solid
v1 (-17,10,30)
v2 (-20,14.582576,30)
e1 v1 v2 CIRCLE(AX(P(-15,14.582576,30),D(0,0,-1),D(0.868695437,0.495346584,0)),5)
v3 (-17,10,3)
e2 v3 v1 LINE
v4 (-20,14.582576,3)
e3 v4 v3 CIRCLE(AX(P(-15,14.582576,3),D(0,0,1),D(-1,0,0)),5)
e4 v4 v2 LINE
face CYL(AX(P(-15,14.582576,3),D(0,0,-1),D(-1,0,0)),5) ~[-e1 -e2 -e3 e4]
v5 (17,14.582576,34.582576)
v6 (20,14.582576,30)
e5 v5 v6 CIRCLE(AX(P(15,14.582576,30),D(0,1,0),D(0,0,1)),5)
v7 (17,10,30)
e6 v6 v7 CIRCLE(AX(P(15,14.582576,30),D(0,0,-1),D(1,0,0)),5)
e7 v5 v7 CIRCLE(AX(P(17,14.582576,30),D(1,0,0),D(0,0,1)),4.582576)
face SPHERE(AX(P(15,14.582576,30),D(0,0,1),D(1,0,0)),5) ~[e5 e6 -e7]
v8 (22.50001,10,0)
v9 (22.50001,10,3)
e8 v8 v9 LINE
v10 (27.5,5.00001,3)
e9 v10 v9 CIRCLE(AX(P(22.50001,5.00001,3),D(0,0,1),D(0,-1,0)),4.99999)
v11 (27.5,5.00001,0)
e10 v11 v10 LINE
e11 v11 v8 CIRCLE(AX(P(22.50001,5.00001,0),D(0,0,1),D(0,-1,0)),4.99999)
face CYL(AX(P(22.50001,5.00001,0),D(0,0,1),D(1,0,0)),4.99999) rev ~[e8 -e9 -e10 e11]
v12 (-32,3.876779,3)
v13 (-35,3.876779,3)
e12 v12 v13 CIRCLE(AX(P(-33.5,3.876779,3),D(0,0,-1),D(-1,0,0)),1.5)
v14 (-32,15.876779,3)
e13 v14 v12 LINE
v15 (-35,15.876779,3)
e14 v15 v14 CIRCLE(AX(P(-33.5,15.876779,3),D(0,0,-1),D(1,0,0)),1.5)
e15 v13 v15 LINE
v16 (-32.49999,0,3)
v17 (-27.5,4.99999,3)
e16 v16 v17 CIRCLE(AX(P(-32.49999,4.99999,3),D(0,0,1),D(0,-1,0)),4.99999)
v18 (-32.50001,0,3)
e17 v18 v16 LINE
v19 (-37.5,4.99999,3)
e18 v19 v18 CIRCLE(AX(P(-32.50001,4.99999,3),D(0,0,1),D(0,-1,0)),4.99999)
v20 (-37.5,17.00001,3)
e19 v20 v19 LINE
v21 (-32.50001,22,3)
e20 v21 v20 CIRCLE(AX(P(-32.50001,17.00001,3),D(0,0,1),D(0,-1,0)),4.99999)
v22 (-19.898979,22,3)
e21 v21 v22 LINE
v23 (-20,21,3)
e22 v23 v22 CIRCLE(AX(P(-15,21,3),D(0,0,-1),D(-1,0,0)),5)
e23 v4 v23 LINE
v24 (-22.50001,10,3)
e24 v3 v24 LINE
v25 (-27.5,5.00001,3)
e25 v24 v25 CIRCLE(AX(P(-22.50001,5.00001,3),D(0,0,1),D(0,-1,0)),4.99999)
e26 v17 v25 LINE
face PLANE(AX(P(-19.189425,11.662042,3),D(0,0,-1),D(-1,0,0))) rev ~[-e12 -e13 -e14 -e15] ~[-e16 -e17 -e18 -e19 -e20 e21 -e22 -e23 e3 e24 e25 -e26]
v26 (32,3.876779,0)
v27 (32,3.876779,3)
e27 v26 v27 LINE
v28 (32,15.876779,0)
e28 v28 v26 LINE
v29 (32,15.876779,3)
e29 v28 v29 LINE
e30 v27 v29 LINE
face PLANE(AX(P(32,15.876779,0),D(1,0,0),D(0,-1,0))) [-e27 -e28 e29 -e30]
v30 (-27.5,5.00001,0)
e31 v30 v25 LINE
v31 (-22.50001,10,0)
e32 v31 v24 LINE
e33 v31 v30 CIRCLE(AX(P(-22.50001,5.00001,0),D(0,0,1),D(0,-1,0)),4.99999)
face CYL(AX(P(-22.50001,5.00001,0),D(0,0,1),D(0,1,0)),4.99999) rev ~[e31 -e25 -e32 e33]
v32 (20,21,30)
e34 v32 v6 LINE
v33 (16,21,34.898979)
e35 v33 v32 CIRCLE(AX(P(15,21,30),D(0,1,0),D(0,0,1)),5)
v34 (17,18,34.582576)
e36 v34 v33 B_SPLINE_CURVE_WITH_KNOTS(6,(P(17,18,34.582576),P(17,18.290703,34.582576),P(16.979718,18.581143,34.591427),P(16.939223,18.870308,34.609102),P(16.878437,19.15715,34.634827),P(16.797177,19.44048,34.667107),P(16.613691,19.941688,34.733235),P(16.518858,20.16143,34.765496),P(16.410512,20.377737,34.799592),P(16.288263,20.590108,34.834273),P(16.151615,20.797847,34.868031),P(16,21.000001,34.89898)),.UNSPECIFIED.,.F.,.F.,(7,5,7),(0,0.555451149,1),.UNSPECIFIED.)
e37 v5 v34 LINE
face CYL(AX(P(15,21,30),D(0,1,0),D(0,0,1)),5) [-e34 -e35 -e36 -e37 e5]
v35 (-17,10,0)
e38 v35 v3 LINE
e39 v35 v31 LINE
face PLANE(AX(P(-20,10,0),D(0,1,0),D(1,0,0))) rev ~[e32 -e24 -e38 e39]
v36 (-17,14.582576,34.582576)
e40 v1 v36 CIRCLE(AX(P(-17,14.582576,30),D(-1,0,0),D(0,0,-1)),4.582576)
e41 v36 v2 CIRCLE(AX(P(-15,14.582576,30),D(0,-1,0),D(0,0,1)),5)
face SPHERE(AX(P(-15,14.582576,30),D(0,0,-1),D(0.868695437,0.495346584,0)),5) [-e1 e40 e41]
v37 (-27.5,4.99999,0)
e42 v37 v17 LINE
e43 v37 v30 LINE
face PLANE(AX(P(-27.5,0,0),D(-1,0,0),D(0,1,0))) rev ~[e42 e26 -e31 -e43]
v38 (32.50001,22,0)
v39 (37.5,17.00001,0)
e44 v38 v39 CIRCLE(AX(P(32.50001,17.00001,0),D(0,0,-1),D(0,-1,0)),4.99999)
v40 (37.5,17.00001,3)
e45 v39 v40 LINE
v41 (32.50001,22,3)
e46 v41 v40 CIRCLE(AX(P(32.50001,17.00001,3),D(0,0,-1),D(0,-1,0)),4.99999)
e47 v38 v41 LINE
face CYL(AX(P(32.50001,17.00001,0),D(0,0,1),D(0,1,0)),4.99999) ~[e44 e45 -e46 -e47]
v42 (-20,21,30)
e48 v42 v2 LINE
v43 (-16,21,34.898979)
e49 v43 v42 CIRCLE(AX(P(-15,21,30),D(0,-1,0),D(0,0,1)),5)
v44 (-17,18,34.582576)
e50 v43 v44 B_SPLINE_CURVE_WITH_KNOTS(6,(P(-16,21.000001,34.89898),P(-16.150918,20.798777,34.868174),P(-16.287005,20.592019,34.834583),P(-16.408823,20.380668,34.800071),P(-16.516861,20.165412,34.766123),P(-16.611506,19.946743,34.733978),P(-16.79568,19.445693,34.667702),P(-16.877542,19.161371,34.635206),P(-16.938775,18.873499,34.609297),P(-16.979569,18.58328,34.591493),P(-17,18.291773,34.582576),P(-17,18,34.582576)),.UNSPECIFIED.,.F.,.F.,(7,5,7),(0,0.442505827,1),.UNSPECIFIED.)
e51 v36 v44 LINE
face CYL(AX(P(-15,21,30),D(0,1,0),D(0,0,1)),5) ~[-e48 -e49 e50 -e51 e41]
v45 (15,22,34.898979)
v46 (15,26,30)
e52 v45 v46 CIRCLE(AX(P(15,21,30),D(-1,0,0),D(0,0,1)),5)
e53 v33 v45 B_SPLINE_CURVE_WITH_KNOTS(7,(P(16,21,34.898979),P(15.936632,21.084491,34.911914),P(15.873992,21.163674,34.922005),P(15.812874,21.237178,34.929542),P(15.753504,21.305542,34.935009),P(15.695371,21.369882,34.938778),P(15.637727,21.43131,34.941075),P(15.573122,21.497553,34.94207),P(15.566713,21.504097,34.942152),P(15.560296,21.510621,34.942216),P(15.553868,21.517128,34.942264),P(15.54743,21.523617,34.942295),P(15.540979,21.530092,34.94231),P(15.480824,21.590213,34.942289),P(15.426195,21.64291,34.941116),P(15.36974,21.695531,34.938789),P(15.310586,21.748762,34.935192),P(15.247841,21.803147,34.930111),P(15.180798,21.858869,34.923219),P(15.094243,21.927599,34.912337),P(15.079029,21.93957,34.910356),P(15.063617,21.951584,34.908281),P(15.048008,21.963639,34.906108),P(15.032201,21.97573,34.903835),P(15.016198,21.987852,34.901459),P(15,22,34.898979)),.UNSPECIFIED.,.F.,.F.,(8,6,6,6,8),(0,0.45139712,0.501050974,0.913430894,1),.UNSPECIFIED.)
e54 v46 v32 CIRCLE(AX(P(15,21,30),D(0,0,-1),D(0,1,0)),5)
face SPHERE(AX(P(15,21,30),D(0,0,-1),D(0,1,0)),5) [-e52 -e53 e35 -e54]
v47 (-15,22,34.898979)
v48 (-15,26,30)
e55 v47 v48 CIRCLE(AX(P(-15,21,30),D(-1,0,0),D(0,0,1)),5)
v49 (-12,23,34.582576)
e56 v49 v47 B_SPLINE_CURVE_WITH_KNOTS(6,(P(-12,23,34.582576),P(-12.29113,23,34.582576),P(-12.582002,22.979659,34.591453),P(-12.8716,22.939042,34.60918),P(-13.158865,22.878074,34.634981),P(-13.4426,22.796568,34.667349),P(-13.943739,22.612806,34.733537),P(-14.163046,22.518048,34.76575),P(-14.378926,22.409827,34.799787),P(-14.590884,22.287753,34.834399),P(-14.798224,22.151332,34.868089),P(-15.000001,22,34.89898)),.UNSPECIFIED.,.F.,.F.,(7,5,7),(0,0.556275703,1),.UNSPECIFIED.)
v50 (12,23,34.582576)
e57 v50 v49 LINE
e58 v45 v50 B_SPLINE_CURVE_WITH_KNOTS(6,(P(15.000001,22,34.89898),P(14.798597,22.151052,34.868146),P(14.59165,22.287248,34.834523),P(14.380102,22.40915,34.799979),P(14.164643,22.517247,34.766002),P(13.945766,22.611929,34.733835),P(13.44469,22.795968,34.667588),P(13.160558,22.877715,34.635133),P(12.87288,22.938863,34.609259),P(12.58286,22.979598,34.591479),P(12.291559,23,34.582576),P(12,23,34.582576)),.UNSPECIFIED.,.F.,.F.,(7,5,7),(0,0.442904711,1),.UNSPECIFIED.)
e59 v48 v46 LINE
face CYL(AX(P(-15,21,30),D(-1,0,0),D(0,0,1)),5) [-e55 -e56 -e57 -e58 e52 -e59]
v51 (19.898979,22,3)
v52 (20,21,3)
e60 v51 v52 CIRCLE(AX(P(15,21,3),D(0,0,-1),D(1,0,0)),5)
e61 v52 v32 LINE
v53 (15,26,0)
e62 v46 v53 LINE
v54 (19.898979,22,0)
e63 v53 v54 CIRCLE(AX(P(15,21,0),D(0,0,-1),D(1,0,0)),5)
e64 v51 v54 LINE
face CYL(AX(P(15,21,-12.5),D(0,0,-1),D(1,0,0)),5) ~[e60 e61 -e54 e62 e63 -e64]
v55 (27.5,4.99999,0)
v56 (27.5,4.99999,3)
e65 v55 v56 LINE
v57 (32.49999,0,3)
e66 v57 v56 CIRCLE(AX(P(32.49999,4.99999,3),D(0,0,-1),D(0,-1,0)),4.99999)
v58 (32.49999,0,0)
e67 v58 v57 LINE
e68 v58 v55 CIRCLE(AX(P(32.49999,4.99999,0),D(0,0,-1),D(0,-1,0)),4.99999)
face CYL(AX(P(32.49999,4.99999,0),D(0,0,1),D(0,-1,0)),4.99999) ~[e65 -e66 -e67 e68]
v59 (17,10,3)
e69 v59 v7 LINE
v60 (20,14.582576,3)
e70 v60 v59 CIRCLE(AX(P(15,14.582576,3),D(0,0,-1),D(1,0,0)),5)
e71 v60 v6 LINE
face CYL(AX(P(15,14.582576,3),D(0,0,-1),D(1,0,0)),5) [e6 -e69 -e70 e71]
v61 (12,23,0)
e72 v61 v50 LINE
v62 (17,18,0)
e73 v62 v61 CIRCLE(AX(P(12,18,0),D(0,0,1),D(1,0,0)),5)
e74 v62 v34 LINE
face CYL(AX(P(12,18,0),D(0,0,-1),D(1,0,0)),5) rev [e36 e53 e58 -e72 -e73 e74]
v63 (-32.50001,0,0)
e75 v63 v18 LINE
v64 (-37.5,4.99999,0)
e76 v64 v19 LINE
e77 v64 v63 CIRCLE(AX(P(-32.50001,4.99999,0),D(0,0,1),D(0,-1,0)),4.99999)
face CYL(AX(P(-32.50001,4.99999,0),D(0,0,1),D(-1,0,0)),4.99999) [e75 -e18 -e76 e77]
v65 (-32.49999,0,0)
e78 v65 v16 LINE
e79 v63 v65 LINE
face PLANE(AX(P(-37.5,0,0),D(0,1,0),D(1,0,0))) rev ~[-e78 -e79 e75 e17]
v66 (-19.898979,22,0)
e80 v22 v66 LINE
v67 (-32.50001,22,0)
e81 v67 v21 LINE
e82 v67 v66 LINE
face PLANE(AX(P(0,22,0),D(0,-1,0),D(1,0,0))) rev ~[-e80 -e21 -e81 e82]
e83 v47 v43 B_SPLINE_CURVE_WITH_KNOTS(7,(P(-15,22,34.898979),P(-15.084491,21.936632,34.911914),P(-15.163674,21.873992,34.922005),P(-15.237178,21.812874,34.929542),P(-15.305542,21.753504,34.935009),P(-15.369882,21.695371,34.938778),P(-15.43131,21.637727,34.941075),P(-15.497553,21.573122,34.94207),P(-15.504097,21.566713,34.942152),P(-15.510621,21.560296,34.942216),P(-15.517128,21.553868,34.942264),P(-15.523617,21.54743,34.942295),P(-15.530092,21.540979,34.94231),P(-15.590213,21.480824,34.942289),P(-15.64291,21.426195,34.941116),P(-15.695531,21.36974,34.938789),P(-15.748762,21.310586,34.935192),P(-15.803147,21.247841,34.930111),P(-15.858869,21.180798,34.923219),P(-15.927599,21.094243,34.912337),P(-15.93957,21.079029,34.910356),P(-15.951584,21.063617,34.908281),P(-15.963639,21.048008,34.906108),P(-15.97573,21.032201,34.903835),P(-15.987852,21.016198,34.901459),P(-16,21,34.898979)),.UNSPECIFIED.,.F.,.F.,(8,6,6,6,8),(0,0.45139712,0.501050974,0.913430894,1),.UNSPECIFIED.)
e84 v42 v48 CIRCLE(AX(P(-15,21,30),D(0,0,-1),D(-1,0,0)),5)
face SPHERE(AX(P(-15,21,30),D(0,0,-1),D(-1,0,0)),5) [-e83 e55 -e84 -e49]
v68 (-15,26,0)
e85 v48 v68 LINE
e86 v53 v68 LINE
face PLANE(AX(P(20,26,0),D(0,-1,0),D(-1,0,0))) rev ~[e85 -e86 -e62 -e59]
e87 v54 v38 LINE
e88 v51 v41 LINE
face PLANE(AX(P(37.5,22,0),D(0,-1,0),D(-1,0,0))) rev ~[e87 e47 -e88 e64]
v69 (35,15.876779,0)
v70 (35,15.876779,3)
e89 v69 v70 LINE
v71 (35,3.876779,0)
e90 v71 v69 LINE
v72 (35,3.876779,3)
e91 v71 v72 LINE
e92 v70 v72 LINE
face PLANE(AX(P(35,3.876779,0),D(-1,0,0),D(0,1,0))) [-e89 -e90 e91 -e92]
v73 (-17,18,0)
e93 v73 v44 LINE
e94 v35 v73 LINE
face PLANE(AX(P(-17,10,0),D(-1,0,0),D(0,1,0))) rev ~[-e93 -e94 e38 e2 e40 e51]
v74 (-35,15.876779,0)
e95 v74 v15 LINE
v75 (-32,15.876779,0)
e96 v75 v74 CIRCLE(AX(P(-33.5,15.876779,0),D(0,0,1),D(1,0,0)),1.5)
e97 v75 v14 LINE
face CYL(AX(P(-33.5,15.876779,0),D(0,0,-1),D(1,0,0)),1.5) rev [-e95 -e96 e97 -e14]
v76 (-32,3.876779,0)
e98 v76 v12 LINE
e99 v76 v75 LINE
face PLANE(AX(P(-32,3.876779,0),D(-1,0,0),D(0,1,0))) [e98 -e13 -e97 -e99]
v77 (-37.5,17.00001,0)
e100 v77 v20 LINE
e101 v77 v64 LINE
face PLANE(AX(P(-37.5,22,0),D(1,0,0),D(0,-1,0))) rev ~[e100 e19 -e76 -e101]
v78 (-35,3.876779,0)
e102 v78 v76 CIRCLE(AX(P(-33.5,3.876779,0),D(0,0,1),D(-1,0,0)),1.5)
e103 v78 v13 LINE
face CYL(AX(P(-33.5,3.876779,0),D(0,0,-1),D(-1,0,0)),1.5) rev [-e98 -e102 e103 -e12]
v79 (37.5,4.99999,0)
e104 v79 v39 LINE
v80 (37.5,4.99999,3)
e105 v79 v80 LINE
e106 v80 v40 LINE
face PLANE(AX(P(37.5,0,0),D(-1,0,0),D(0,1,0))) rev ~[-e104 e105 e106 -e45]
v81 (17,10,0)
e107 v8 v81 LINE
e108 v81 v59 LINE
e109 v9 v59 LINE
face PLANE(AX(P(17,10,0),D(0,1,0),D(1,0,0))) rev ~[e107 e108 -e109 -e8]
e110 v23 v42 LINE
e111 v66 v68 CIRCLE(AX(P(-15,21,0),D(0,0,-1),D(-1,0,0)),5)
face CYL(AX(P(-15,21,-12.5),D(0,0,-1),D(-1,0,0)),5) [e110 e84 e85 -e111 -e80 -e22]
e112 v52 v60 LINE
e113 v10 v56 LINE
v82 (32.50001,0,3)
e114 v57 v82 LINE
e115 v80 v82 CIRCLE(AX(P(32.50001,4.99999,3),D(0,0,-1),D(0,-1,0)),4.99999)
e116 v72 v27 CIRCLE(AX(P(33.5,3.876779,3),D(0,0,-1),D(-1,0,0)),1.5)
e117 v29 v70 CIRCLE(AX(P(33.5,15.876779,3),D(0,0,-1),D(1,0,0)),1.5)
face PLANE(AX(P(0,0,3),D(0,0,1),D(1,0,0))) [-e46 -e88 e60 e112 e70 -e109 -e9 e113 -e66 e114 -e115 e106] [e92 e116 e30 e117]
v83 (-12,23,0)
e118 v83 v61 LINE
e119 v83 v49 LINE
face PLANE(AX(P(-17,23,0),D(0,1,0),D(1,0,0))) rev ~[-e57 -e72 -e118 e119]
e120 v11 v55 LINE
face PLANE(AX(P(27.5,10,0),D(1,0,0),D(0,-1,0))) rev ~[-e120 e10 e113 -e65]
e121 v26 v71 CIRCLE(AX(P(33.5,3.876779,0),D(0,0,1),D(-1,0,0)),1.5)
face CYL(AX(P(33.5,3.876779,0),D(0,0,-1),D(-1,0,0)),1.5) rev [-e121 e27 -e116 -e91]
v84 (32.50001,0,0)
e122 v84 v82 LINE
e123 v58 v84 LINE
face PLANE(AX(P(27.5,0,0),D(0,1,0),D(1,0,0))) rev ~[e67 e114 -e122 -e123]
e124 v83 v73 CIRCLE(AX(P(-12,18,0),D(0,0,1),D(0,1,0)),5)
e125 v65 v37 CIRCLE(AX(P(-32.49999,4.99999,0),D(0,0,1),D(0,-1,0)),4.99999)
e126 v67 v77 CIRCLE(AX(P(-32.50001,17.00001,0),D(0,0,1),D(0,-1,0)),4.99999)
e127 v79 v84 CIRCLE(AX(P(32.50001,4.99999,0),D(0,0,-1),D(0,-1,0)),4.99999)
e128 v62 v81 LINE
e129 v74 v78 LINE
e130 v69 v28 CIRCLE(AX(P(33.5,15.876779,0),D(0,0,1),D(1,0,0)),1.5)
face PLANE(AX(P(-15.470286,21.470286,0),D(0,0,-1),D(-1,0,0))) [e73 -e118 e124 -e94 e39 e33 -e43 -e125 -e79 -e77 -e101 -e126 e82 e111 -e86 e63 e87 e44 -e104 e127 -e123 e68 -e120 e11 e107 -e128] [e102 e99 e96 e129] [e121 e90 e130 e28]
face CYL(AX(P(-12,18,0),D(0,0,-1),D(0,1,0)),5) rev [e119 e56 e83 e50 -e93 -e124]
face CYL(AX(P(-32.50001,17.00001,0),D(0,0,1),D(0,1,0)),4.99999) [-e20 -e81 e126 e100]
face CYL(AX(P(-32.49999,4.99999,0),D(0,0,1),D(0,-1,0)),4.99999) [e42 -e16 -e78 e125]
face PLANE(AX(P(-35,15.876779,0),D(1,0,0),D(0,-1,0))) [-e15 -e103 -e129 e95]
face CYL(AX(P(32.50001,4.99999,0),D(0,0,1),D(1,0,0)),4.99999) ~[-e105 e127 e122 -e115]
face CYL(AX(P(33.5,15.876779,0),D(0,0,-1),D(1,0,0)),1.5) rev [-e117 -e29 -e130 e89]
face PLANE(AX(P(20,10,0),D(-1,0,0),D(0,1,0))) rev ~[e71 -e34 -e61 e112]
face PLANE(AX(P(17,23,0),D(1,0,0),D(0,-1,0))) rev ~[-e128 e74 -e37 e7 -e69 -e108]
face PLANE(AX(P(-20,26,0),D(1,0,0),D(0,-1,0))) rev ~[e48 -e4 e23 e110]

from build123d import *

# Parameters (mm, degrees)
F2_DEPTH     = 35
F3_DEPTH     = 3
F4_DEPTH     = 25
F5_R         = 4.99999
F6_T1_DEPTH  = 35
F6_T3_DEPTH  = 35
F6_T8_DEPTH  = 60
F6_T13_DEPTH = 60
F6_T15_DEPTH = 43.4564392374
F6_T20_DEPTH = 60
F6_T25_DEPTH = 60
F6_T27_DEPTH = 43.4564392374
F7_T1_DEPTH  = 6.417424305
F7_T3_DEPTH  = 30
F7_T6_ANGLE  = 89.9999999974
F7_T8_ANGLE  = 89.9999999974
F7_T10_ANGLE = 209.6926070845
F7_T12_ANGLE = 209.6926070845


# Not quite as in the source:
# - a fillet or chamfer that OpenCascade refuses, or shapes differently, is made with other operations: its cross-section is extruded or revolved along the edge and cut away or added
# - a fillet or chamfer is up to 0.001 mm smaller than in the source, because OpenCascade refuses the exact size


with BuildPart() as f2:
    # F0 (on Top) → F2 (new body)
    with BuildSketch(Plane.XY):
        Polygon((20, 26), (0, 26), (-20, 26), (-20, 22), (-20, 10), (-17, 10), (-17, 23), (0, 23), (17, 23), (17, 10), (20, 10), (20, 22), align=None)
    extrude(amount=F2_DEPTH)

    # F0 (on Top) → F3 (join)
    with BuildSketch(Plane.XY):
        Polygon((-20, 10), (-20, 22), (-37.5, 22), (-37.5, 0), (-27.5, 0), (-27.5, 10), align=None)
        Polygon((37.5, 22), (20, 22), (20, 10), (27.5, 10), (27.5, 0), (37.5, 0), align=None)
    extrude(amount=F3_DEPTH)

    # F1 (on Top) → F4 (cut)
    with BuildSketch(Plane.XY):
        with BuildLine():
            Line((35, 3.8767794613), (35, 15.8767794613))
            ThreePointArc((35, 15.8767794613), (33.5, 17.3767794613), (32, 15.8767794613))
            Line((32, 15.8767794613), (32, 3.8767794613))
            ThreePointArc((32, 3.8767794613), (33.5, 2.3767794613), (35, 3.8767794613))
        make_face()
        with BuildLine():
            ThreePointArc((-32, 15.8767794613), (-33.5, 17.3767794613), (-35, 15.8767794613))
            Line((-35, 15.8767794613), (-35, 3.8767794613))
            ThreePointArc((-35, 3.8767794613), (-33.5, 2.3767794613), (-32, 3.8767794613))
            Line((-32, 3.8767794613), (-32, 15.8767794613))
        make_face()
    extrude(amount=F4_DEPTH, mode=Mode.SUBTRACT)

    # F5 (radius 5 in the source; OpenCascade refuses exactly that, so slightly less here)
    f5_edges = [f2.edges().sort_by_distance(p)[0] for p in [
        (-37.5, 0, 1.5),
        (-27.5, 0, 1.5),
        (-37.5, 22, 1.5),
        (37.5, 22, 1.5),
        (37.5, 0, 1.5),
        (27.5, 0, 1.5),
        (27.5, 10, 1.5),
        (-27.5, 10, 1.5),
    ]]
    fillet(f5_edges, radius=F5_R)

    # F6: fillet of radius 5 on 6 edges, made by hand

    # F6_s2 → F6_t1 (join)
    with BuildSketch(Plane.XY):
        with BuildLine():
            ThreePointArc((17, 18), (15.5355339059, 21.5355339059), (12, 23))
            Line((12, 23), (17, 23))
            Line((17, 23), (17, 18))
        make_face()
    extrude(amount=F6_T1_DEPTH)

    # F6_s4 → F6_t3 (join)
    with BuildSketch(Plane.XY):
        with BuildLine():
            ThreePointArc((-12, 23), (-15.5355339059, 21.5355339059), (-17, 18))
            Line((-17, 18), (-17, 23))
            Line((-17, 23), (-12, 23))
        make_face()
    extrude(amount=F6_T3_DEPTH)


with BuildPart() as f6_tool6:
    # F6_s7 → F6_t8 (new body)
    with BuildSketch(Plane.XY.offset(-12.5)):
        with BuildLine():
            ThreePointArc((20, 21), (18.5355339059, 24.5355339059), (15, 26))
            Line((15, 26), (20, 26))
            Line((20, 26), (20, 21))
        make_face()
    extrude(amount=F6_T8_DEPTH)

    split(bisect_by=Plane.XZ.offset(-22), keep=Keep.BOTTOM)


with BuildPart() as f2_1:
    add(f2.part)

    # F6_t5: cut F6_tool6
    add(f6_tool6.part, mode=Mode.SUBTRACT)


with BuildPart() as f6_tool11:
    # F6_s12 → F6_t13 (new body)
    with BuildSketch(Plane.XY.offset(-12.5)):
        with BuildLine():
            ThreePointArc((20, 21), (18.5355339059, 24.5355339059), (15, 26))
            Line((15, 26), (20, 26))
            Line((20, 26), (20, 21))
        make_face()
    extrude(amount=F6_T13_DEPTH)

    split(bisect_by=Plane.XY.offset(3), keep=Keep.TOP)


with BuildPart() as f2_2:
    add(f2_1.part)

    # F6_t10: cut F6_tool11
    add(f6_tool11.part, mode=Mode.SUBTRACT)

    # F6_s16 → F6_t15 (cut)
    with BuildSketch(Plane.XY.offset(3)):
        with BuildLine():
            ThreePointArc((20, 14.582575695), (19.1833001327, 11.8439629074), (17, 10))
            Line((17, 10), (20, 10))
            Line((20, 10), (20, 14.582575695))
        make_face()
    extrude(amount=F6_T15_DEPTH, mode=Mode.SUBTRACT)


with BuildPart() as f6_tool18:
    # F6_s19 → F6_t20 (new body)
    with BuildSketch(Plane.XY.offset(-12.5)):
        with BuildLine():
            ThreePointArc((-20, 21), (-18.5355339059, 24.5355339059), (-15, 26))
            Line((-15, 26), (-20, 26))
            Line((-20, 26), (-20, 21))
        make_face()
    extrude(amount=F6_T20_DEPTH)

    split(bisect_by=Plane.XZ.offset(-22), keep=Keep.BOTTOM)


with BuildPart() as f2_3:
    add(f2_2.part)

    # F6_t17: cut F6_tool18
    add(f6_tool18.part, mode=Mode.SUBTRACT)


with BuildPart() as f6_tool23:
    # F6_s24 → F6_t25 (new body)
    with BuildSketch(Plane.XY.offset(-12.5)):
        with BuildLine():
            ThreePointArc((-20, 21), (-18.5355339059, 24.5355339059), (-15, 26))
            Line((-15, 26), (-20, 26))
            Line((-20, 26), (-20, 21))
        make_face()
    extrude(amount=F6_T25_DEPTH)

    split(bisect_by=Plane.XY.offset(3), keep=Keep.TOP)


with BuildPart() as f2_4:
    add(f2_3.part)

    # F6_t22: cut F6_tool23
    add(f6_tool23.part, mode=Mode.SUBTRACT)

    # F6_s28 → F6_t27 (cut)
    with BuildSketch(Plane.XY.offset(3)):
        with BuildLine():
            ThreePointArc((-20, 14.582575695), (-19.1833001327, 11.8439629074), (-17, 10))
            Line((-17, 10), (-20, 10))
            Line((-20, 10), (-20, 14.582575695))
        make_face()
    extrude(amount=F6_T27_DEPTH, mode=Mode.SUBTRACT)

    # F7: fillet of radius 5 on 3 edges, made by hand

    # F7_s2 → F7_t1 (cut)
    with BuildSketch(Plane.XZ.offset(-21)):
        with BuildLine():
            ThreePointArc((-15, 35), (-18.5355339059, 33.5355339059), (-20, 30))
            Line((-20, 30), (-20, 35))
            Line((-20, 35), (-15, 35))
        make_face()
        with BuildLine():
            ThreePointArc((15, 35), (18.5355339059, 33.5355339059), (20, 30))
            Line((20, 30), (20, 35))
            Line((20, 35), (15, 35))
        make_face()
    extrude(amount=F7_T1_DEPTH, mode=Mode.SUBTRACT)

    # F7_s4 → F7_t3 (cut)
    with BuildSketch(Plane.YZ.offset(-15)):
        with BuildLine():
            ThreePointArc((21, 35), (24.5355339059, 33.5355339059), (26, 30))
            Line((26, 30), (26, 35))
            Line((26, 35), (21, 35))
        make_face()
    extrude(amount=F7_T3_DEPTH, mode=Mode.SUBTRACT)

    # F7_s5 → F7_t6 (revolve, cut)
    with BuildSketch(Plane.YZ.offset(14.9999999999)):
        with BuildLine():
            ThreePointArc((21, 35), (24.5355339059, 33.5355339059), (26, 30))
            Line((26, 30), (26, 35))
            Line((26, 35), (21, 35))
        make_face()
    revolve(axis=Axis((14.9999999999, 20.9999999999, 35), (0, 0, -1)), revolution_arc=F7_T6_ANGLE, mode=Mode.SUBTRACT)

    # F7_s7 → F7_t8 (revolve, cut)
    with BuildSketch(Plane.XZ.offset(-20.9999999999)):
        with BuildLine():
            ThreePointArc((-15, 35), (-18.5355339059, 33.5355339059), (-20, 30))
            Line((-20, 30), (-20, 35))
            Line((-20, 35), (-15, 35))
        make_face()
    revolve(axis=Axis((-14.9999999999, 20.9999999999, 35), (0, 0, -1)), revolution_arc=F7_T8_ANGLE, mode=Mode.SUBTRACT)

    # F7_s9 → F7_t10 (revolve, cut)
    with BuildSketch(Plane.XZ.offset(-14.5825756948)):
        with BuildLine():
            ThreePointArc((20, 30), (18.5355339059, 33.5355339059), (15, 35))
            Line((15, 35), (20, 35))
            Line((20, 35), (20, 30))
        make_face()
    revolve(axis=Axis((15.0000000002, 14.5825756948, 35), (0, 0, -1)), revolution_arc=F7_T10_ANGLE, mode=Mode.SUBTRACT)

    # F7_s11 → F7_t12 (revolve, cut)
    with BuildSketch(Plane(origin=(-9.9554834358, 17.4590545428, 0), x_dir=(0, 0, 1), z_dir=(-0.4953465841, 0.8686954366, 0))):
        with BuildLine():
            ThreePointArc((35, -5.8070024913), (33.5355339059, -2.2714685854), (30, -0.8070024913))
            Line((30, -0.8070024913), (35, -0.8070024913))
            Line((35, -0.8070024913), (35, -5.8070024913))
        make_face()
    revolve(axis=Axis((-15.0000000002, 14.5825756948, 35), (0, 0, -1)), revolution_arc=F7_T12_ANGLE, mode=Mode.SUBTRACT)


solid = f2_4.part
